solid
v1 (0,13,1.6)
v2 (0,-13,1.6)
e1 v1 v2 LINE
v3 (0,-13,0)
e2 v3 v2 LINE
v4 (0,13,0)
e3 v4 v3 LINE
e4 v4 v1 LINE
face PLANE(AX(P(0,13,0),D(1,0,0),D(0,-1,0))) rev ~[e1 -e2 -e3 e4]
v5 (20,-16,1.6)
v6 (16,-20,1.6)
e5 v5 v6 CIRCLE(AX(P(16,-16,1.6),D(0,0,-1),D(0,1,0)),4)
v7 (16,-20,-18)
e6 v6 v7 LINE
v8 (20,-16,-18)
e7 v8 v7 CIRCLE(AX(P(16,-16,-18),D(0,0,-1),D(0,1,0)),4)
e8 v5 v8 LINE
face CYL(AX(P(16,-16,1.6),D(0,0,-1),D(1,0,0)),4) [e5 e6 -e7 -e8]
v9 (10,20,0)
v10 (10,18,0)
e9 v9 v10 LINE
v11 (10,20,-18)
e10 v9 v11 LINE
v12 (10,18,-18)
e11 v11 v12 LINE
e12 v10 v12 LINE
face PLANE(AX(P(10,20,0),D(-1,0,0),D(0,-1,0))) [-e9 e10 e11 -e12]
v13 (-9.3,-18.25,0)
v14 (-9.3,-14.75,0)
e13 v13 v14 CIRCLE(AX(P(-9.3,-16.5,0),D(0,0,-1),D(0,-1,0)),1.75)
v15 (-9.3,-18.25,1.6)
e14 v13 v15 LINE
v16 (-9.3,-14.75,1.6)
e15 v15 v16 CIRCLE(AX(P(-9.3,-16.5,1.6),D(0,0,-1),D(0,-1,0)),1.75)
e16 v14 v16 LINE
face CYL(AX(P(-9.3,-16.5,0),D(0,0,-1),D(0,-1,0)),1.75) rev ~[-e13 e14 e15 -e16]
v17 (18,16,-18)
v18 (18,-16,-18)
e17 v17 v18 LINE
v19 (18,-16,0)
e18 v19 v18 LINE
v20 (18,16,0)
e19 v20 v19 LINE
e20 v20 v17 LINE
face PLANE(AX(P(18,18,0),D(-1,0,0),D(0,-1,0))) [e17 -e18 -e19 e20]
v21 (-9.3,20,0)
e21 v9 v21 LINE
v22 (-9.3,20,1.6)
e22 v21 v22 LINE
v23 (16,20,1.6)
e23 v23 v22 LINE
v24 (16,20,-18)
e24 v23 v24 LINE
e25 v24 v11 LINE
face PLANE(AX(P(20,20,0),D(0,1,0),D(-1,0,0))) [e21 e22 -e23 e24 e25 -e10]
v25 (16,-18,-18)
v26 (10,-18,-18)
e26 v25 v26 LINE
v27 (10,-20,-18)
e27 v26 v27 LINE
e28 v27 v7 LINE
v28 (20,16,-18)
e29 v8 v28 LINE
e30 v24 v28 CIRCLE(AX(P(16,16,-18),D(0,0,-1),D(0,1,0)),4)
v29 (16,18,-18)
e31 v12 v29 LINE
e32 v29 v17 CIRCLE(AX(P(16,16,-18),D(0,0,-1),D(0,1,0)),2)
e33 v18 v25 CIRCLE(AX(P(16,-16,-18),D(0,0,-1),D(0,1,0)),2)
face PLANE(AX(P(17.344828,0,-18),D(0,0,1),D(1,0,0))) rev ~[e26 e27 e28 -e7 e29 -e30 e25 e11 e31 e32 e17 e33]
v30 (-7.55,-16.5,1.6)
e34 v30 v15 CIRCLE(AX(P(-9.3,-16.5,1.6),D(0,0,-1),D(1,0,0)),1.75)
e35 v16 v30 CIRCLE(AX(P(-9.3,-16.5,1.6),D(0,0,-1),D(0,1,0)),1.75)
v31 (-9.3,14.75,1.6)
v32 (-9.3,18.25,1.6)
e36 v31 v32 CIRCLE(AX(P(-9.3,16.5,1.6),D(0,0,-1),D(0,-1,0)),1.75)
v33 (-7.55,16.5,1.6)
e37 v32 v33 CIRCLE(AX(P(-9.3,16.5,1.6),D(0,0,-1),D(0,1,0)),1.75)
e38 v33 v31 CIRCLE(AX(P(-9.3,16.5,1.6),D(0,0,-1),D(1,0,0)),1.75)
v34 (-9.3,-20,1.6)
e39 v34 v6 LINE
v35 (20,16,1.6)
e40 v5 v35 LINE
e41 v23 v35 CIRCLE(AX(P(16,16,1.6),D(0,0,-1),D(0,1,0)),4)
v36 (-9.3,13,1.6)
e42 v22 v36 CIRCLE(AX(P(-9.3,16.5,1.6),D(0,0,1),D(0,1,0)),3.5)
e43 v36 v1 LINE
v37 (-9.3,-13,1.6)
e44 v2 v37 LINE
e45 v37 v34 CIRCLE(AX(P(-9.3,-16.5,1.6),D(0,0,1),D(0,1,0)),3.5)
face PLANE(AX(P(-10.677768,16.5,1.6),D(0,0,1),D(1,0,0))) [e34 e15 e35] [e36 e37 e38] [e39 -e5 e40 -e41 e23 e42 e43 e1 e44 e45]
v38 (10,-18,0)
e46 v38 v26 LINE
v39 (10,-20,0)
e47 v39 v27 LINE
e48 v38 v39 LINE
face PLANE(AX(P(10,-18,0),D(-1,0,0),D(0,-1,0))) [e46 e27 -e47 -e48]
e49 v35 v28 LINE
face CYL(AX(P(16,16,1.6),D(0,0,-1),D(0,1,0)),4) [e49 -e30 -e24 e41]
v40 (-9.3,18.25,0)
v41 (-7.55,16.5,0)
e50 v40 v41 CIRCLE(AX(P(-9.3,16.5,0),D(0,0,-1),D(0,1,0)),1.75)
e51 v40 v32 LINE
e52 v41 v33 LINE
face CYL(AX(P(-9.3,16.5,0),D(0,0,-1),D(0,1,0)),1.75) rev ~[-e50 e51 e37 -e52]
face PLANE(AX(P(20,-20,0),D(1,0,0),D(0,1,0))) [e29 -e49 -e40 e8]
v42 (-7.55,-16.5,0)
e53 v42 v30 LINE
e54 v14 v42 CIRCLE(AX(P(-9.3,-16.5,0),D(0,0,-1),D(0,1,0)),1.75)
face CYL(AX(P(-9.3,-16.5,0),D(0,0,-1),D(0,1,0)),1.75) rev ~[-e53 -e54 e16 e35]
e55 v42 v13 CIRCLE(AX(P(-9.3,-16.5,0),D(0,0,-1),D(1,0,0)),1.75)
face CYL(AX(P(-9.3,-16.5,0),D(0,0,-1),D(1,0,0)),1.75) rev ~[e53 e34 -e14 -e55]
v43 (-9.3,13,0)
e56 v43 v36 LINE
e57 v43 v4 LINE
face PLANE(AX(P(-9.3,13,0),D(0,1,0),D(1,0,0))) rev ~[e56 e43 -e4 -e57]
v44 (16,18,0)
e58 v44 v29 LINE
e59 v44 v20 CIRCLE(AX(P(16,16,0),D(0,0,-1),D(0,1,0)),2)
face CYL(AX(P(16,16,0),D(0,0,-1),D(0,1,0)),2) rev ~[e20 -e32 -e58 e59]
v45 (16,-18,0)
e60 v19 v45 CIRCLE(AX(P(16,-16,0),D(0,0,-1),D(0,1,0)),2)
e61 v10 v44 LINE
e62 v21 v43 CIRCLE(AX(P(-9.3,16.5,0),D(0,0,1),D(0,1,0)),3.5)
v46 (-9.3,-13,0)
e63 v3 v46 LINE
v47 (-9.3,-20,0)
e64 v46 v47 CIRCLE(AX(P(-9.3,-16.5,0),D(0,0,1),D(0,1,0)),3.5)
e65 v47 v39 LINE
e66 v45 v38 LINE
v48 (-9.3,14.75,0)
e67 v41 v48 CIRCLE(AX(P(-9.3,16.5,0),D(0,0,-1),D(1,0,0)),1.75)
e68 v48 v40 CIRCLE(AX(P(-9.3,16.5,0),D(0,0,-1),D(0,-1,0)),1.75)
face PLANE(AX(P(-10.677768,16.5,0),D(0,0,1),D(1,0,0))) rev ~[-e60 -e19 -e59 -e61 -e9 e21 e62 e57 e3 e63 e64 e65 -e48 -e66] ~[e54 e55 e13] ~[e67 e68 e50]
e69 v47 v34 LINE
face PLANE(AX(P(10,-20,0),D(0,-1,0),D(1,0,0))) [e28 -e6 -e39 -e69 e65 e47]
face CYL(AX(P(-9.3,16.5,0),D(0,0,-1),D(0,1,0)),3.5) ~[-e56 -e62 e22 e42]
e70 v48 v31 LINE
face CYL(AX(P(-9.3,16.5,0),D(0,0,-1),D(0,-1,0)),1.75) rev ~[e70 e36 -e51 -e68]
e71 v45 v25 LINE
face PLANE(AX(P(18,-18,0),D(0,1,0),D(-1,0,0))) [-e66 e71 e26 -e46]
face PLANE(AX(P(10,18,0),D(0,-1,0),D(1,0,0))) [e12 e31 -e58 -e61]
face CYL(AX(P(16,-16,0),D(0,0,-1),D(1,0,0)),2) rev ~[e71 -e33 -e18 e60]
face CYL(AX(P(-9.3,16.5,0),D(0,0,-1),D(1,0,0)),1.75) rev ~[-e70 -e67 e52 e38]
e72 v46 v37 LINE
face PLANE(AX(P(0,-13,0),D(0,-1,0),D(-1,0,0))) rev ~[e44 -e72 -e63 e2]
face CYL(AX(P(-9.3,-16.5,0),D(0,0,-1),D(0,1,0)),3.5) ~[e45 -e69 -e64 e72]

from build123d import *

# Parameters (mm, degrees)
F1_DEPTH = 1.6
F2_DEPTH = 18
F3_R     = 4
F4_R     = 2


# Not quite as in the source:
# - a feature names something its author has since deleted; it is built from what else it names


with BuildPart() as f1:
    # F0 (on Top) → F1 (new body)
    with BuildSketch(Plane.XY):
        with BuildLine():
            Line((-9.3, 18.25), (-9.3, 20))
            ThreePointArc((-9.3, 20), (-12.8, 16.5), (-9.3, 13))
            Line((-9.3, 13), (-9.3, 14.75))
            ThreePointArc((-9.3, 14.75), (-11.05, 16.5), (-9.3, 18.25))
        make_face()
        with BuildLine():
            ThreePointArc((-5.8, 16.5), (-6.8251262658, 18.9748737342), (-9.3, 20))
            Line((-9.3, 20), (-9.3, 18.25))
            ThreePointArc((-9.3, 18.25), (-8.0625631329, 17.7374368671), (-7.55, 16.5))
            ThreePointArc((-7.55, 16.5), (-8.0625631329, 15.2625631329), (-9.3, 14.75))
            Line((-9.3, 14.75), (-9.3, 13))
            ThreePointArc((-9.3, 13), (-6.8251262658, 14.0251262658), (-5.8, 16.5))
        make_face()
        with BuildLine():
            Line((0, 13), (0, 20))
            Line((0, 20), (-9.3, 20))
            ThreePointArc((-9.3, 20), (-6.8251262658, 18.9748737342), (-5.8, 16.5))
            ThreePointArc((-5.8, 16.5), (-6.8251262658, 14.0251262658), (-9.3, 13))
            Line((-9.3, 13), (0, 13))
        make_face()
        with BuildLine():
            Line((-9.3, -14.75), (-9.3, -13))
            ThreePointArc((-9.3, -13), (-12.8, -16.5), (-9.3, -20))
            Line((-9.3, -20), (-9.3, -18.25))
            ThreePointArc((-9.3, -18.25), (-11.05, -16.5), (-9.3, -14.75))
        make_face()
        with BuildLine():
            ThreePointArc((-5.8, -16.5), (-6.8251262658, -14.0251262658), (-9.3, -13))
            Line((-9.3, -13), (-9.3, -14.75))
            ThreePointArc((-9.3, -14.75), (-8.0625631329, -15.2625631329), (-7.55, -16.5))
            ThreePointArc((-7.55, -16.5), (-8.0625631329, -17.7374368671), (-9.3, -18.25))
            Line((-9.3, -18.25), (-9.3, -20))
            ThreePointArc((-9.3, -20), (-6.8251262658, -18.9748737342), (-5.8, -16.5))
        make_face()
        with BuildLine():
            Line((0, -20), (0, -13))
            Line((0, -13), (-9.3, -13))
            ThreePointArc((-9.3, -13), (-6.8251262658, -14.0251262658), (-5.8, -16.5))
            ThreePointArc((-5.8, -16.5), (-6.8251262658, -18.9748737342), (-9.3, -20))
            Line((-9.3, -20), (0, -20))
        make_face()
        Polygon((2, 18), (0, 20), (0, 13), (0, -13), (0, -20), (2, -18), align=None)
        Polygon((20, 20), (10, 20), (10, 18), (18, 18), (18, -18), (10, -18), (10, -20), (20, -20), align=None)
        Polygon((10, 18), (2, 18), (2, -18), (10, -18), (18, -18), (18, 18), align=None)
        Polygon((10, 20), (0, 20), (2, 18), (10, 18), align=None)
        Polygon((10, -18), (2, -18), (0, -20), (10, -20), align=None)
    extrude(amount=F1_DEPTH)

    # F0 (on Top) → F2 (join)
    with BuildSketch(Plane.XY):
        Polygon((20, 20), (10, 20), (10, 18), (18, 18), (18, -18), (10, -18), (10, -20), (20, -20), align=None)
    extrude(amount=-F2_DEPTH)

    # F3
    f3_edges = [f1.edges().sort_by_distance(p)[0] for p in [
        (20, -20, -8.2),
        (20, 20, -8.2),
    ]]
    fillet(f3_edges, radius=F3_R)

    # F4
    f4_edges = [f1.edges().sort_by_distance(p)[0] for p in [
        (18, -18, -9),
        (18, 18, -9),
    ]]
    fillet(f4_edges, radius=F4_R)


solid = f1.part
